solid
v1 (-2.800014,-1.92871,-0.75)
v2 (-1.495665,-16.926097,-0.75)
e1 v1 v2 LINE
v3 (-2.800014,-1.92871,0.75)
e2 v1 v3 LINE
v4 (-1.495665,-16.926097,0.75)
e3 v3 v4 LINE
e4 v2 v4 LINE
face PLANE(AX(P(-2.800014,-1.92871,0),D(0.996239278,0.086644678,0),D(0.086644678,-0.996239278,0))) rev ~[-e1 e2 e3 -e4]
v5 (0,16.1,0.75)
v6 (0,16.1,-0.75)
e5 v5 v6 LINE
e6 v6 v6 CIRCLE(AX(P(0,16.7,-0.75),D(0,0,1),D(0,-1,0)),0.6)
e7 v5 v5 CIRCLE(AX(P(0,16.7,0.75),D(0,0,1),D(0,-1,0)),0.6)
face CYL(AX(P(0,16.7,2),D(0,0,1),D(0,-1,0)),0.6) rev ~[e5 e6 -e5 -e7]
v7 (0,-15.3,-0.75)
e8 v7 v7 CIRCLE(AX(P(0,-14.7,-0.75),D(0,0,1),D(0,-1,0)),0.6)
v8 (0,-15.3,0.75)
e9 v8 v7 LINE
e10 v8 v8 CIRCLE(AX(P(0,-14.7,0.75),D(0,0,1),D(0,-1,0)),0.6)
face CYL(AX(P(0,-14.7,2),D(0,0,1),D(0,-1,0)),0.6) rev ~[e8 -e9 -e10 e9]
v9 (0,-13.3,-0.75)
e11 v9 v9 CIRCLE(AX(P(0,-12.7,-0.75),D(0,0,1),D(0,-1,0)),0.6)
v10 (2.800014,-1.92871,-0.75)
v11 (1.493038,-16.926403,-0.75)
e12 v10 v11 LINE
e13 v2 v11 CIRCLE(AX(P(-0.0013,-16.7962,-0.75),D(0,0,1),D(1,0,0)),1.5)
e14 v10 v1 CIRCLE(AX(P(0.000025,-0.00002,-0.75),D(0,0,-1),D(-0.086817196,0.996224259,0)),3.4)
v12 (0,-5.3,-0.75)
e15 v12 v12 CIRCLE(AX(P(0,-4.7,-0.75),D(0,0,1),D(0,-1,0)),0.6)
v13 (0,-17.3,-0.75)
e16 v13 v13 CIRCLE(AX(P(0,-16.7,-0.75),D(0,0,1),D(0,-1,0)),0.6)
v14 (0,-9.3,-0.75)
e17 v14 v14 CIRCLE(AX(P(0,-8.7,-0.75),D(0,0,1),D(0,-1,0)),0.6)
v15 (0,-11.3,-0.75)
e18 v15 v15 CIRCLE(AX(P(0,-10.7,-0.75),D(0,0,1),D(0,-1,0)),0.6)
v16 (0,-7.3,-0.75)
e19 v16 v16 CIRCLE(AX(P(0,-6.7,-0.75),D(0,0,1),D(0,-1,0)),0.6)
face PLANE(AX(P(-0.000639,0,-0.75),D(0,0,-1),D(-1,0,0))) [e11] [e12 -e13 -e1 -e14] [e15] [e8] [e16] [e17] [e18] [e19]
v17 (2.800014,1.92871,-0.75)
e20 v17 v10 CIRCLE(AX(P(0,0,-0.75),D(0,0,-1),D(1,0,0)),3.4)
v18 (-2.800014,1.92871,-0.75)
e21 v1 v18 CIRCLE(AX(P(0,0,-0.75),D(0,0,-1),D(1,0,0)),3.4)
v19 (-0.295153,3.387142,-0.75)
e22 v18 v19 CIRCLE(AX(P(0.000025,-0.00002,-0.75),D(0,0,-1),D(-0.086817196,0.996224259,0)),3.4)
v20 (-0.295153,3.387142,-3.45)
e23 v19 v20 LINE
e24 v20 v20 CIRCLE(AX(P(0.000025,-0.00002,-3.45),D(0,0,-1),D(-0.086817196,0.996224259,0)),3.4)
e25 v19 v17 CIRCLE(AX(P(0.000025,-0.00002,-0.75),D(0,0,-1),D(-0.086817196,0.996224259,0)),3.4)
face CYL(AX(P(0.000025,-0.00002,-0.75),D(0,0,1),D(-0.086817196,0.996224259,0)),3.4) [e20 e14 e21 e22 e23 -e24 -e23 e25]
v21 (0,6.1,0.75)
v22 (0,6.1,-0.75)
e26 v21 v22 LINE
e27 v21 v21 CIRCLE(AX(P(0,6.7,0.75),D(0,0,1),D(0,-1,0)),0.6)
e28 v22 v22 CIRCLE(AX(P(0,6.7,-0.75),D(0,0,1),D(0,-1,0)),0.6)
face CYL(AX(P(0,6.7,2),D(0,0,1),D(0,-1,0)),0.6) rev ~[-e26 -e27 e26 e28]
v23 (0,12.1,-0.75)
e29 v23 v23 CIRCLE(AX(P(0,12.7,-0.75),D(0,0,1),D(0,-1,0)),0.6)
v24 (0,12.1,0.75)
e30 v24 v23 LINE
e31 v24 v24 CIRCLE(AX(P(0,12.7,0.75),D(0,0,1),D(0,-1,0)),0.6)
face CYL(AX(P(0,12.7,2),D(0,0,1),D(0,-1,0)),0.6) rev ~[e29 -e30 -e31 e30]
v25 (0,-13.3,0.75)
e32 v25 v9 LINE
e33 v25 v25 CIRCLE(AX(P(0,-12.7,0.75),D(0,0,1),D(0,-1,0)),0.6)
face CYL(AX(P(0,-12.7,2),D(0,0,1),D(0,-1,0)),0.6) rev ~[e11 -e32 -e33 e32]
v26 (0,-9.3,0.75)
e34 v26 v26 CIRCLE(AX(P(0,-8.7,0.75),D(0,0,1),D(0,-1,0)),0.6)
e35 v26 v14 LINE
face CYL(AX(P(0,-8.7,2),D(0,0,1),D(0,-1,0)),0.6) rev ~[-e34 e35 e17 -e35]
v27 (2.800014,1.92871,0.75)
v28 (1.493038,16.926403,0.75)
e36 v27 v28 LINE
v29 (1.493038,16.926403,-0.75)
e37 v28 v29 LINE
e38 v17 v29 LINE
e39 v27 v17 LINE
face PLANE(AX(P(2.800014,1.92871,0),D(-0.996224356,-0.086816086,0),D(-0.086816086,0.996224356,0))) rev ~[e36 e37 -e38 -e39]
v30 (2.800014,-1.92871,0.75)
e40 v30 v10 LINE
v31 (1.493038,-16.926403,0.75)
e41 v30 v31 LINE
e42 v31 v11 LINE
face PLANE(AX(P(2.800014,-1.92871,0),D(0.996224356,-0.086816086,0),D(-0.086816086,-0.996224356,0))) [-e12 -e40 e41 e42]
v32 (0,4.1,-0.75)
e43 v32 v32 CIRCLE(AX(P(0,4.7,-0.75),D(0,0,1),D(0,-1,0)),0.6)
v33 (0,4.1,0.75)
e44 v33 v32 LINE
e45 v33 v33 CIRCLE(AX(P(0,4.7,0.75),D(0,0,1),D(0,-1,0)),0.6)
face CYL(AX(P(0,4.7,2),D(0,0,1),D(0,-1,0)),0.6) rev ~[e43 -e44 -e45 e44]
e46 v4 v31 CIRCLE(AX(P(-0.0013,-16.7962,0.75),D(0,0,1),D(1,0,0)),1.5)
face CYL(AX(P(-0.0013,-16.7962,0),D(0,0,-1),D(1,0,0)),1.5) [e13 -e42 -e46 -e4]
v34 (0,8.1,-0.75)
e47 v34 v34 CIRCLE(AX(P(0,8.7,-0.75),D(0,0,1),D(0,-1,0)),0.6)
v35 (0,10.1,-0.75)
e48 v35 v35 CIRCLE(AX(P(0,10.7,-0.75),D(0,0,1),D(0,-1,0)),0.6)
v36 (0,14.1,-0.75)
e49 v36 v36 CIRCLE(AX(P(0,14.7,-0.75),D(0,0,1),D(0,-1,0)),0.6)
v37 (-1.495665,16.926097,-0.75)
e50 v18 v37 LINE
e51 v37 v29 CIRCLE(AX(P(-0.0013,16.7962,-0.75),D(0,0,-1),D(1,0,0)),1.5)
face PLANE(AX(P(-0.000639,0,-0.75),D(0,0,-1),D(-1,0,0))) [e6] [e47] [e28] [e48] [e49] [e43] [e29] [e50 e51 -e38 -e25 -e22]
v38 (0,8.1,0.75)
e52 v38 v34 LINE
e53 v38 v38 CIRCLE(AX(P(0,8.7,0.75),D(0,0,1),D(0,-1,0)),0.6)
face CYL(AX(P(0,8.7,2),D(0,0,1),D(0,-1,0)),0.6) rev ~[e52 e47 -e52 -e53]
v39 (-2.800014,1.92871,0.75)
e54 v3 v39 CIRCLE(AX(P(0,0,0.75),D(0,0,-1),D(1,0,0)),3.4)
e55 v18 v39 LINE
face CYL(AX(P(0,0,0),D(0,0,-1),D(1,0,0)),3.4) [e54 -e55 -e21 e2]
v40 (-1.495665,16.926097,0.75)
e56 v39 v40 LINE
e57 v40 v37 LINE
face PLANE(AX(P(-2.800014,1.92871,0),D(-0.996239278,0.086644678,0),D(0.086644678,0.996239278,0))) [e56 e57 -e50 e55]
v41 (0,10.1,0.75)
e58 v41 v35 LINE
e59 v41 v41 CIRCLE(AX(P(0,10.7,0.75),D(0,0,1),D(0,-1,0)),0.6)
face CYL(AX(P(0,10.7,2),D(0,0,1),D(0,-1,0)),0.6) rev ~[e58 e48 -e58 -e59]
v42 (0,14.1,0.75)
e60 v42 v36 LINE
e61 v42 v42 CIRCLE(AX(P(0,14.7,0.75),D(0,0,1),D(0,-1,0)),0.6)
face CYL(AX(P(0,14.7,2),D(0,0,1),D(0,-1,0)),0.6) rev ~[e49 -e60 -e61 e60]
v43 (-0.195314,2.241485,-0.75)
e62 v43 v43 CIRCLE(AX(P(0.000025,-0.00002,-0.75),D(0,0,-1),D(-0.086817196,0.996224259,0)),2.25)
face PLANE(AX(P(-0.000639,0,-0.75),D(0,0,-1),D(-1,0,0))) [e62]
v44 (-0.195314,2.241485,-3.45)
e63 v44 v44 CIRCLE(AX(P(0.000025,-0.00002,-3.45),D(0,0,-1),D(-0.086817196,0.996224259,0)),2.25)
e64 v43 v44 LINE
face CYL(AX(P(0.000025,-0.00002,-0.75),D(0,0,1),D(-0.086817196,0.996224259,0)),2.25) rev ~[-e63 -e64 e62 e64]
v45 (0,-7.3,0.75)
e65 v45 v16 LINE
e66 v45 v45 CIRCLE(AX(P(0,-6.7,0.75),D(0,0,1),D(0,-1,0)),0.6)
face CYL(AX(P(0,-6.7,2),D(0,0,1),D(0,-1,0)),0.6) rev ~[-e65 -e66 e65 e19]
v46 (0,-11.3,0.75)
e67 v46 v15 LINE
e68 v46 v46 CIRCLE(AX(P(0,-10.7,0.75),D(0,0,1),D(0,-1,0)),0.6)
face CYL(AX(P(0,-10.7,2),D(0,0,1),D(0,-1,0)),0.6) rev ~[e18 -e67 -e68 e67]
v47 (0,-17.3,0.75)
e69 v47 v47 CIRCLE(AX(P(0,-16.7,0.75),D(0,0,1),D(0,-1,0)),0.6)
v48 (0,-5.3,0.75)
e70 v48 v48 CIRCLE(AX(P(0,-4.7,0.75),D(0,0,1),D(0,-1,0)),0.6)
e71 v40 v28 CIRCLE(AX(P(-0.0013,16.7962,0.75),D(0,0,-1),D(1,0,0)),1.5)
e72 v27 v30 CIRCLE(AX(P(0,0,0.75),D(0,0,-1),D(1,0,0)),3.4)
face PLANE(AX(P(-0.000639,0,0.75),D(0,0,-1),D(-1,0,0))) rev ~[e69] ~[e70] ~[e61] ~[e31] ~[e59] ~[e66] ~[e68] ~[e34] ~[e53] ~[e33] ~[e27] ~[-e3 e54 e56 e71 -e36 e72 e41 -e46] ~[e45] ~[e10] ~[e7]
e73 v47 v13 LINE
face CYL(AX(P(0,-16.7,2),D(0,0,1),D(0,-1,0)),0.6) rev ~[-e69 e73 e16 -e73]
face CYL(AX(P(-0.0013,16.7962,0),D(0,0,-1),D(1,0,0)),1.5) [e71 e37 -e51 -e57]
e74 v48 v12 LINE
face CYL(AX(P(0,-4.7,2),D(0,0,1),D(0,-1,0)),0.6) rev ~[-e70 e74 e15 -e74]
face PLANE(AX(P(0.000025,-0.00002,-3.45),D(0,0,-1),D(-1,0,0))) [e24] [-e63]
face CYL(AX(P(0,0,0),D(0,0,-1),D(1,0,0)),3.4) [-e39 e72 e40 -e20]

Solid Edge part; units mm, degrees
sketch "Sketch1" plane through (0, 0, 0) normal (0, 0, 1) x (1, 0, 0)
  line L0 (-2.8, 1.9287) -> (-1.4957, 16.9261)
  line L1 (2.8, 1.9287) -> (1.493, 16.9264)
  arc A0 (2.8, 1.9287) -> (2.8, -1.9287) centre (0, 0) cw
  line L2 (2.8, -1.9287) -> (1.493, -16.9264)
  arc A1 (-1.4957, -16.9261) -> (1.493, -16.9264) centre (-0.0013, -16.7962) ccw
  line L3 (-2.8, -1.9287) -> (-1.4957, -16.9261)
  arc A2 (-2.8, -1.9287) -> (-2.8, 1.9287) centre (0, 0) cw
  arc A3 (-1.4957, 16.9261) -> (1.493, 16.9264) centre (-0.0013, 16.7962) cw
  dimension "D1" = 16.7962
  dimension "D2" = 3.4
  dimension "D3" = 5.6
extrude "Protrusion1" add sketch "Sketch1" along normal mid plane 1.5
hole "Agujero_8" at (0, 14.7, 2) direction (0, 0, -1) diameter 1.2 end up to next
hole "Hole1" at (0, 4.7, 2) direction (0, 0, -1) diameter 1.2 end up to next
hole "Hole2" at (0, 6.7, 2) direction (0, 0, -1) diameter 1.2 end up to next
hole "Hole3" at (0, 8.7, 2) direction (0, 0, -1) diameter 1.2 end up to next
hole "Hole4" at (0, 10.7, 2) direction (0, 0, -1) diameter 1.2 end up to next
hole "Hole5" at (0, 12.7, 2) direction (0, 0, -1) diameter 1.2 end up to next
hole "Hole6" at (0, 16.7, 2) direction (0, 0, -1) diameter 1.2 end up to next
hole "Hole7" at (0, -14.7, 2) direction (0, 0, -1) diameter 1.2 end up to next
hole "Hole8" at (0, -4.7, 2) direction (0, 0, -1) diameter 1.2 end up to next
hole "Hole9" at (0, -6.7, 2) direction (0, 0, -1) diameter 1.2 end up to next
hole "Hole10" at (0, -8.7, 2) direction (0, 0, -1) diameter 1.2 end up to next
hole "Hole11" at (0, -10.7, 2) direction (0, 0, -1) diameter 1.2 end up to next
hole "Hole12" at (0, -12.7, 2) direction (0, 0, -1) diameter 1.2 end up to next
hole "Hole13" at (0, -16.7, 2) direction (0, 0, -1) diameter 1.2 end up to next
sketch "Sketch2" plane through (0, 7.4481, -0.75) normal (0, 0, -1) x (-0.0868172, 0.9962243, 0)
  circle A0 centre (-7.42, -0.6466) radius 2.25
  circle A1 centre (-7.42, -0.6466) radius 3.4
extrude "ProtrusiónExtruida_2" add sketch "Sketch2" along normal blind 2.7
properties material "ABS, medio impacto"
